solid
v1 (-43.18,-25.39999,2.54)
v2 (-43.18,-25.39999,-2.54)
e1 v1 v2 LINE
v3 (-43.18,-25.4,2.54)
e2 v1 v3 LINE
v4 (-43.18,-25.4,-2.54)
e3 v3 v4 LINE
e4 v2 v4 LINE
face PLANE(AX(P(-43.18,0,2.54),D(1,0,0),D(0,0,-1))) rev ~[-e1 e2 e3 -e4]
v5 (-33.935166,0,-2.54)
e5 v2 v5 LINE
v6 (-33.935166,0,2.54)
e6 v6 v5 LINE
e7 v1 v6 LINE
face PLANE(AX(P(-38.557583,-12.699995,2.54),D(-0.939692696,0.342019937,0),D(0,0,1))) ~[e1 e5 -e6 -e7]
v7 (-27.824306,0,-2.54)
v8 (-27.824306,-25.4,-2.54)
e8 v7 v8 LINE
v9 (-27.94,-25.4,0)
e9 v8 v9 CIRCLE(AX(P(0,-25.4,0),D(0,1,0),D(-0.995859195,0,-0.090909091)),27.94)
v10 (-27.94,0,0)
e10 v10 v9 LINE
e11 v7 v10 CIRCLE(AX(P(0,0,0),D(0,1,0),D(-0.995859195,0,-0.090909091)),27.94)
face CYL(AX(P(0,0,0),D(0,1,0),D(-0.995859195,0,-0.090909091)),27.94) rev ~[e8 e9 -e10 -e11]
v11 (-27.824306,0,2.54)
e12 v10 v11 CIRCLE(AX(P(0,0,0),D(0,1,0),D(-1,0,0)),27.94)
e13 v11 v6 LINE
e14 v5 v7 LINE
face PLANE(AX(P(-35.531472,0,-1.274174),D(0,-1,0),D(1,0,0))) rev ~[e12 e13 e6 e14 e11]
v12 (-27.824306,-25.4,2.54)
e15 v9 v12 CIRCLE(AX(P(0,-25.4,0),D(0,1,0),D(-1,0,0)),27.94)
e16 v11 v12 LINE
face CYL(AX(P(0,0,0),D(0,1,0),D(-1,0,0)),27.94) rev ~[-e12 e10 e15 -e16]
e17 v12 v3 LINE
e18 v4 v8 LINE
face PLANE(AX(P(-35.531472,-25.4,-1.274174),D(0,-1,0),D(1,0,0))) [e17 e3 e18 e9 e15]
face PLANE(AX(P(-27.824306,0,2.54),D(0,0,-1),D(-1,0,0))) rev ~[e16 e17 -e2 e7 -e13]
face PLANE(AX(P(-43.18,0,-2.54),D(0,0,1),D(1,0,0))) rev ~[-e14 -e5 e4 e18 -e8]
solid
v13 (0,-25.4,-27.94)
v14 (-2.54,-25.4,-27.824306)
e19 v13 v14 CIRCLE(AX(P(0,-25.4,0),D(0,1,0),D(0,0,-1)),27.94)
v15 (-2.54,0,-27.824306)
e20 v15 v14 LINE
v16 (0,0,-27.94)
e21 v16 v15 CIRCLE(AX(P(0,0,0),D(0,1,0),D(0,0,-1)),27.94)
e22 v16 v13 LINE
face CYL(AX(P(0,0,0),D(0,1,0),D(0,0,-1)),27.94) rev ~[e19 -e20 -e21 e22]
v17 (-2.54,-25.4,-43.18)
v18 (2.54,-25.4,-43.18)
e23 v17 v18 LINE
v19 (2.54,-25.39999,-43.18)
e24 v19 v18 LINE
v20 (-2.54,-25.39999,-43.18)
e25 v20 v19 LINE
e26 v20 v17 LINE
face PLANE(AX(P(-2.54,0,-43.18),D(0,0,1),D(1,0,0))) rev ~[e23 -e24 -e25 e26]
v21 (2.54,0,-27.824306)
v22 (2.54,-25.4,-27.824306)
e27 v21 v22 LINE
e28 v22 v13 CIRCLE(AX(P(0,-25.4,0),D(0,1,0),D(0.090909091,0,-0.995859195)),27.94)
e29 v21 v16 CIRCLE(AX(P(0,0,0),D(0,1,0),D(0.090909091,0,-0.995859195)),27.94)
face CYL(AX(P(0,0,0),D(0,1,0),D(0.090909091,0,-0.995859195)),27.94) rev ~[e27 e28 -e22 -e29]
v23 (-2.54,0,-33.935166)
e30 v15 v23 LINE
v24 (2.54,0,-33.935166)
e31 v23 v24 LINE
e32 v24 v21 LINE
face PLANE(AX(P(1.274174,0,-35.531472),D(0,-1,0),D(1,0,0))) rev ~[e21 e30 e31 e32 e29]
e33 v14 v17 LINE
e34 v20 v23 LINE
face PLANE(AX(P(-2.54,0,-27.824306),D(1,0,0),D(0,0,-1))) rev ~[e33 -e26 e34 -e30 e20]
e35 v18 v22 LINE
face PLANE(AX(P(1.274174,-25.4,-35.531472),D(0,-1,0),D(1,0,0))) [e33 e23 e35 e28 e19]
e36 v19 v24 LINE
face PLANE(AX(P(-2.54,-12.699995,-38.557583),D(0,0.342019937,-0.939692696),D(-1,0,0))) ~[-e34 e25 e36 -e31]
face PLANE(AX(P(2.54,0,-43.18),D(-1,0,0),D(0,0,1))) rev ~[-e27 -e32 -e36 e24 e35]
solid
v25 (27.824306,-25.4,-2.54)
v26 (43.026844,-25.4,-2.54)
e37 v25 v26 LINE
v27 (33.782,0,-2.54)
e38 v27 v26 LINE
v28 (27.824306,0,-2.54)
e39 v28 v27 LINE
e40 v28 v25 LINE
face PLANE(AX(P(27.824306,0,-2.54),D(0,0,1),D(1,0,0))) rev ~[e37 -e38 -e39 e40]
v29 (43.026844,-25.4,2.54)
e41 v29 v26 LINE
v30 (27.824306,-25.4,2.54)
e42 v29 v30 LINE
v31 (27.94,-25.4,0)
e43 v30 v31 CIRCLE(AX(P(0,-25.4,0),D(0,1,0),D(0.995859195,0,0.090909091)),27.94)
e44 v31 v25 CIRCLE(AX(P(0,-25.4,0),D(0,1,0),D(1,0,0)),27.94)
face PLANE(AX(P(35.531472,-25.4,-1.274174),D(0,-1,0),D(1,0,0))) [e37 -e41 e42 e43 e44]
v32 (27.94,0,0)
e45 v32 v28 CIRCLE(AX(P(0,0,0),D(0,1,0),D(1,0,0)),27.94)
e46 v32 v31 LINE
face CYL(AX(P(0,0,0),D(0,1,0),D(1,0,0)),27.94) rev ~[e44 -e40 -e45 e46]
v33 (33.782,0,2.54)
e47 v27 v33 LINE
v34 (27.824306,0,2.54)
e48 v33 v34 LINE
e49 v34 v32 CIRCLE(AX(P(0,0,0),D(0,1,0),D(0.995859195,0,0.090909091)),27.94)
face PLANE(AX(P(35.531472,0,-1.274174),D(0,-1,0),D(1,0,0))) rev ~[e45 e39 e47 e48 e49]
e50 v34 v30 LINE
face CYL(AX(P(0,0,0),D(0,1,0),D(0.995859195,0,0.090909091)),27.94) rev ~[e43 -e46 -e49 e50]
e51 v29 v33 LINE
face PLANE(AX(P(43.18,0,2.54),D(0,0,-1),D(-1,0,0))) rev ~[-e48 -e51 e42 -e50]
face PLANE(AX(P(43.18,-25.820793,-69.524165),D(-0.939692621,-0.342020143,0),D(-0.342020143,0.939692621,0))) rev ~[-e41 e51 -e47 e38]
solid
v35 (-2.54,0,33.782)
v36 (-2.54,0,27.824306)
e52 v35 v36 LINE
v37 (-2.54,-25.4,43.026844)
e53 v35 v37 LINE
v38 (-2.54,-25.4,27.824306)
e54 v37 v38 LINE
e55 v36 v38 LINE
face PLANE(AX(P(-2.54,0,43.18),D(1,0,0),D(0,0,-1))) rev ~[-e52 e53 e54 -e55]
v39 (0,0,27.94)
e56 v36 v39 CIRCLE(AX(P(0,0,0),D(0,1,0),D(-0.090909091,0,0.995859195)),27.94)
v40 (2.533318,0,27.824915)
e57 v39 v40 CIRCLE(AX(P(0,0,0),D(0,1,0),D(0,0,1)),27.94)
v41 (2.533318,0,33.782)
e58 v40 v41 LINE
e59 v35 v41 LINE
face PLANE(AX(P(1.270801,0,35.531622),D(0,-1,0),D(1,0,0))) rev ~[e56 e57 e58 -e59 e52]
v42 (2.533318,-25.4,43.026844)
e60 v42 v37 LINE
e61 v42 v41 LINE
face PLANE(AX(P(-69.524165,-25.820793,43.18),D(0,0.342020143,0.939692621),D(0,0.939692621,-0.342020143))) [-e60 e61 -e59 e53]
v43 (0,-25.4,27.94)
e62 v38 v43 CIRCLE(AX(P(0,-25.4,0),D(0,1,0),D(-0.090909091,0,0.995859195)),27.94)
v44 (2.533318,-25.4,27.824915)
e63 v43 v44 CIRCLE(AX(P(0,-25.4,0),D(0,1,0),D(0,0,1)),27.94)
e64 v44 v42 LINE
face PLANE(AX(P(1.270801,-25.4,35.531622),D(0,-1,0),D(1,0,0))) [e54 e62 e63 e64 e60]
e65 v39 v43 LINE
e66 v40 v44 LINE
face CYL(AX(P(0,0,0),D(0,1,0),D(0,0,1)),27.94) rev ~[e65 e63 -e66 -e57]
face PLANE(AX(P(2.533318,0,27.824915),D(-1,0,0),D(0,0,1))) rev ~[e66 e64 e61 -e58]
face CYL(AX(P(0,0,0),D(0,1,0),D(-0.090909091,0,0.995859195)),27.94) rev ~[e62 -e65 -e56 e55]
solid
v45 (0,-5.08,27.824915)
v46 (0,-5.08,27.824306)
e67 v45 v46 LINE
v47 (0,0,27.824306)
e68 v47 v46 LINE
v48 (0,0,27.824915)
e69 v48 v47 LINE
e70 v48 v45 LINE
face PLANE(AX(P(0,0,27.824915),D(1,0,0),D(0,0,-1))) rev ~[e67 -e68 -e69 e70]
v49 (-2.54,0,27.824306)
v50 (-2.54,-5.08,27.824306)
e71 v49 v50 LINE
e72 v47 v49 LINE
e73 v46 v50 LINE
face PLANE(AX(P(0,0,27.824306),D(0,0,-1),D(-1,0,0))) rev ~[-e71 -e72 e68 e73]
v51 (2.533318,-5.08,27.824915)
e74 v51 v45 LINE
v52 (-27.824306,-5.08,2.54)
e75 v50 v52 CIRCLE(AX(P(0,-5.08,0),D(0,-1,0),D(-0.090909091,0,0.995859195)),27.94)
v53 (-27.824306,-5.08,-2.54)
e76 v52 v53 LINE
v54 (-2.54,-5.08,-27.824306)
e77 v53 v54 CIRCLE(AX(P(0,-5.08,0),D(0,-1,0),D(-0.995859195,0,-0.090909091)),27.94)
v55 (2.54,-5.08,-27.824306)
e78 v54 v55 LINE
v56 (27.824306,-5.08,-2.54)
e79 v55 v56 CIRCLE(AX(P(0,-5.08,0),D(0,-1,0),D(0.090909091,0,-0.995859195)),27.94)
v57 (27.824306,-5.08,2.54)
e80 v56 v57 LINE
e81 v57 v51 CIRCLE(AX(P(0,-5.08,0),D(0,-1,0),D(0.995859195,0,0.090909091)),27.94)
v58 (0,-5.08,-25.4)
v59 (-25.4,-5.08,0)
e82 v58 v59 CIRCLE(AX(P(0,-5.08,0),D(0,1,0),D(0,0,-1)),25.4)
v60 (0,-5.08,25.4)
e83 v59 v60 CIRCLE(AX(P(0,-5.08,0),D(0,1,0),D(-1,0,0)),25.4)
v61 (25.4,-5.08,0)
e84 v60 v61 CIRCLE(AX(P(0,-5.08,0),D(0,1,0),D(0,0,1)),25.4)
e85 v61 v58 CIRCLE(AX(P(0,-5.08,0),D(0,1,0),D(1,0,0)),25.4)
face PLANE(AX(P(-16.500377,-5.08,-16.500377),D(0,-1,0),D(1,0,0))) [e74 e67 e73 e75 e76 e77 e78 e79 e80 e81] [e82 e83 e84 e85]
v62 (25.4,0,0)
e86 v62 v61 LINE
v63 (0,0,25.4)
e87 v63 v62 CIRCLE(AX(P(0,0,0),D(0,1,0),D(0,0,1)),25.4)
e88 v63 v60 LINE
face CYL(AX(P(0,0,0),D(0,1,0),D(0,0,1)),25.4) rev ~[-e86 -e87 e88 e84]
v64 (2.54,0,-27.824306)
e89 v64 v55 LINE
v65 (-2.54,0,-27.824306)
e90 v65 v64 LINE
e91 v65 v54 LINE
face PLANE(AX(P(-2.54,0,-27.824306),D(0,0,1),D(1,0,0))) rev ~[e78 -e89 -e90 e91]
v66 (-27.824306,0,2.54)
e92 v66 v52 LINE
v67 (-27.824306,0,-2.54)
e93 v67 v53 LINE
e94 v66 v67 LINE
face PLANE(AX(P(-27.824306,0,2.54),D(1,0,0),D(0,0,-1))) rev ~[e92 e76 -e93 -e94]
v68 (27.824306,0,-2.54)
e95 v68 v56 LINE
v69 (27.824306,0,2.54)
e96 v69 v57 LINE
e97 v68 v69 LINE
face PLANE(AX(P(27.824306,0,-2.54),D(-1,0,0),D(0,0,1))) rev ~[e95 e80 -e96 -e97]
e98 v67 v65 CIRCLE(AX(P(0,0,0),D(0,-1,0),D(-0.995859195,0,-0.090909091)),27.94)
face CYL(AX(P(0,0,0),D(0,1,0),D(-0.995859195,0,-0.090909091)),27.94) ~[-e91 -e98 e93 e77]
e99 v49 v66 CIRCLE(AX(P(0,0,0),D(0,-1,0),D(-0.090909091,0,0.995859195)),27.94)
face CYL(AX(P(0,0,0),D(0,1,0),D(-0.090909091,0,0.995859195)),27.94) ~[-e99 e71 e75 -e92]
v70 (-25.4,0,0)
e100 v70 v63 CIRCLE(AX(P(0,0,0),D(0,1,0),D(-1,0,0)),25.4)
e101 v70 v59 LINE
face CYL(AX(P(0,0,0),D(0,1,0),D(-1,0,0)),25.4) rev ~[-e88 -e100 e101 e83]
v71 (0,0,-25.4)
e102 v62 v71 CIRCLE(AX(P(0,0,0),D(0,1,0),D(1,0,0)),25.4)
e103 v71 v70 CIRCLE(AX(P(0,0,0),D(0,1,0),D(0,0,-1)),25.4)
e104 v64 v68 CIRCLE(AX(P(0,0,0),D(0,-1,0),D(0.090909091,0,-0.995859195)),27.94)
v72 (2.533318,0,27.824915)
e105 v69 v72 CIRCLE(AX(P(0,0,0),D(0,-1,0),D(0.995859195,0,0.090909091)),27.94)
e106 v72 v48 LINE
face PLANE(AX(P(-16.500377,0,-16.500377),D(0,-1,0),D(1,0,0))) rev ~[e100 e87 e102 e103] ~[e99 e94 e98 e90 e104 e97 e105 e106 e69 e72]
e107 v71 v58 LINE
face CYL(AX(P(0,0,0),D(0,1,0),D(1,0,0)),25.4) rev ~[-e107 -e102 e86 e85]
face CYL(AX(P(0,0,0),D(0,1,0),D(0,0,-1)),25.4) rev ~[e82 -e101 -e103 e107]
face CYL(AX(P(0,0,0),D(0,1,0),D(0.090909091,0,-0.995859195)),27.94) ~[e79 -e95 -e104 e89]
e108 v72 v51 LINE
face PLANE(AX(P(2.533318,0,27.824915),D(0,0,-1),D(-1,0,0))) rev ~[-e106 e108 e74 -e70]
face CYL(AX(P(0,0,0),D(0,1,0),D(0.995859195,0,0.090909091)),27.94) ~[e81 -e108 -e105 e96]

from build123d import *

# Parameters (mm, degrees)
F1_DEPTH    = 5.08
F2_DEPTH    = 25.4
F3_SIZE2    = 9.244834
F3_SIZE     = 25.39999
F4_T1_DEPTH = 139.04164749
F5_T1_DEPTH = 139.048329282
F6_SIZE2    = 9.244834
F6_SIZE     = 25.39999


# Not quite as in the source:
# - a fillet or chamfer that OpenCascade refuses, or shapes differently, is made with other operations: its cross-section is extruded or revolved along the edge and cut away or added
# - a fillet or chamfer is up to 0.001 mm smaller than in the source, because OpenCascade refuses the exact size


with BuildPart() as f1:
    # F0 (on Front) → F1 (new body)
    with BuildSketch(Plane.XZ):
        with BuildLine():
            Line((0, -27.8243059213), (0, -25.4))
            ThreePointArc((0, -25.4), (-17.9605122421, -17.9605122421), (-25.4, 0))
            Line((-25.4, 0), (-27.8243059213, 0))
            Line((-27.8243059213, 0), (-27.8243059213, -2.54))
            ThreePointArc((-27.8243059213, -2.54), (-19.7565634664, -19.7565634664), (-2.54, -27.8243059213))
            Line((-2.54, -27.8243059213), (0, -27.8243059213))
        make_face()
        with BuildLine():
            Line((27.8243059213, 0), (25.4, 0))
            ThreePointArc((25.4, 0), (17.9605122421, -17.9605122421), (0, -25.4))
            Line((0, -25.4), (0, -27.8243059213))
            Line((0, -27.8243059213), (2.54, -27.8243059213))
            ThreePointArc((2.54, -27.8243059213), (19.7565634664, -19.7565634664), (27.8243059213, -2.54))
            Line((27.8243059213, -2.54), (27.8243059213, 0))
        make_face()
        with BuildLine():
            ThreePointArc((0, 25.4), (17.9605122421, 17.9605122421), (25.4, 0))
            Line((25.4, 0), (27.8243059213, 0))
            Line((27.8243059213, 0), (27.8243059213, 2.54))
            ThreePointArc((27.8243059213, 2.54), (19.7541911569, 19.758935491), (2.533318208, 27.8249150737))
            Line((2.533318208, 27.8249150737), (0, 27.8249150737))
            Line((0, 27.8249150737), (0, 27.8243059213))
            Line((0, 27.8243059213), (0, 25.4))
        make_face()
        with BuildLine():
            ThreePointArc((-25.4, 0), (-17.9605122421, 17.9605122421), (0, 25.4))
            Line((0, 25.4), (0, 27.8243059213))
            Line((0, 27.8243059213), (-2.54, 27.8243059213))
            ThreePointArc((-2.54, 27.8243059213), (-19.7565634664, 19.7565634664), (-27.8243059213, 2.54))
            Line((-27.8243059213, 2.54), (-27.8243059213, 0))
            Line((-27.8243059213, 0), (-25.4, 0))
        make_face()
    extrude(amount=F1_DEPTH)


with BuildPart() as f2:
    # F0 (on Front) → F2 (new body)
    with BuildSketch(Plane.XZ):
        with BuildLine():
            ThreePointArc((-27.8243059213, -2.54), (-27.911061494, -1.2713167504), (-27.94, 0))
            Line((-27.94, 0), (-43.18, 0))
            Line((-43.18, 0), (-43.18, -2.54))
            Line((-43.18, -2.54), (-27.8243059213, -2.54))
        make_face()
        with BuildLine():
            Line((-43.18, 0), (-27.94, 0))
            ThreePointArc((-27.94, 0), (-27.911061494, 1.2713167504), (-27.8243059213, 2.54))
            Line((-27.8243059213, 2.54), (-43.18, 2.54))
            Line((-43.18, 2.54), (-43.18, 0))
        make_face()
    extrude(amount=F2_DEPTH)

    # F3 (size 25.4 and 9.2448439504 in the source; OpenCascade refuses exactly that, so slightly less here)
    f3_edges = [f2.edges().sort_by_distance(p)[0] for p in [
        (-43.18, 0, 0),
    ]]
    chamfer(f3_edges, length=F3_SIZE, length2=F3_SIZE2)


with BuildPart() as f2b:
    # F0 (on Front) → F2, piece 2 (new body)
    with BuildSketch(Plane.XZ):
        with BuildLine():
            ThreePointArc((0, 27.94), (1.2679654651, 27.9112139395), (2.533318208, 27.8249150737))
            Line((2.533318208, 27.8249150737), (2.533318208, 43.18))
            Line((2.533318208, 43.18), (0, 43.18))
            Line((0, 43.18), (0, 27.94))
        make_face()
        with BuildLine():
            Line((-2.54, 43.18), (-2.54, 27.8243059213))
            ThreePointArc((-2.54, 27.8243059213), (-1.2713167504, 27.911061494), (0, 27.94))
            Line((0, 27.94), (0, 43.18))
            Line((0, 43.18), (-2.54, 43.18))
        make_face()
    extrude(amount=F2_DEPTH)

    # F4: chamfer of 9.398 x 25.820792788 on 1 edges, made by hand

    # F4_s2 → F4_t1 (cut)
    with BuildSketch(Plane.YZ.offset(-69.524164641)):
        Polygon((-25.820792788, 43.18), (0, 33.782), (0, 43.18), align=None)
    extrude(amount=F4_T1_DEPTH, mode=Mode.SUBTRACT)


with BuildPart() as f2c:
    # F0 (on Front) → F2, piece 3 (new body)
    with BuildSketch(Plane.XZ):
        with BuildLine():
            Line((43.18, 0), (27.94, 0))
            ThreePointArc((27.94, 0), (27.911061494, -1.2713167504), (27.8243059213, -2.54))
            Line((27.8243059213, -2.54), (43.18, -2.54))
            Line((43.18, -2.54), (43.18, 0))
        make_face()
        with BuildLine():
            ThreePointArc((27.8243059213, 2.54), (27.911061494, 1.2713167504), (27.94, 0))
            Line((27.94, 0), (43.18, 0))
            Line((43.18, 0), (43.18, 2.54))
            Line((43.18, 2.54), (27.8243059213, 2.54))
        make_face()
    extrude(amount=F2_DEPTH)

    # F5: chamfer of 9.398 x 25.820792788 on 1 edges, made by hand

    # F5_s2 → F5_t1 (cut)
    with BuildSketch(Plane.XY.offset(-69.524164641)):
        Polygon((43.18, -25.820792788), (33.782, 0), (43.18, 0), align=None)
    extrude(amount=F5_T1_DEPTH, mode=Mode.SUBTRACT)


with BuildPart() as f2d:
    # F0 (on Front) → F2, piece 4 (new body)
    with BuildSketch(Plane.XZ):
        with BuildLine():
            ThreePointArc((2.54, -27.8243059213), (1.2713167504, -27.911061494), (0, -27.94))
            Line((0, -27.94), (0, -43.18))
            Line((0, -43.18), (2.54, -43.18))
            Line((2.54, -43.18), (2.54, -27.8243059213))
        make_face()
        with BuildLine():
            Line((0, -43.18), (0, -27.94))
            ThreePointArc((0, -27.94), (-1.2713167504, -27.911061494), (-2.54, -27.8243059213))
            Line((-2.54, -27.8243059213), (-2.54, -43.18))
            Line((-2.54, -43.18), (0, -43.18))
        make_face()
    extrude(amount=F2_DEPTH)

    # F6 (size 25.4 and 9.2448439504 in the source; OpenCascade refuses exactly that, so slightly less here)
    f6_edges = [f2d.edges().sort_by_distance(p)[0] for p in [
        (0, 0, -43.18),
    ]]
    f6_side = f2d.faces().sort_by_distance((0, -12.7, -43.18))[0]
    chamfer(f6_edges, length=F6_SIZE, length2=F6_SIZE2, reference=f6_side)


solid = Compound([f1.part, f2.part, f2b.part, f2c.part, f2d.part])
